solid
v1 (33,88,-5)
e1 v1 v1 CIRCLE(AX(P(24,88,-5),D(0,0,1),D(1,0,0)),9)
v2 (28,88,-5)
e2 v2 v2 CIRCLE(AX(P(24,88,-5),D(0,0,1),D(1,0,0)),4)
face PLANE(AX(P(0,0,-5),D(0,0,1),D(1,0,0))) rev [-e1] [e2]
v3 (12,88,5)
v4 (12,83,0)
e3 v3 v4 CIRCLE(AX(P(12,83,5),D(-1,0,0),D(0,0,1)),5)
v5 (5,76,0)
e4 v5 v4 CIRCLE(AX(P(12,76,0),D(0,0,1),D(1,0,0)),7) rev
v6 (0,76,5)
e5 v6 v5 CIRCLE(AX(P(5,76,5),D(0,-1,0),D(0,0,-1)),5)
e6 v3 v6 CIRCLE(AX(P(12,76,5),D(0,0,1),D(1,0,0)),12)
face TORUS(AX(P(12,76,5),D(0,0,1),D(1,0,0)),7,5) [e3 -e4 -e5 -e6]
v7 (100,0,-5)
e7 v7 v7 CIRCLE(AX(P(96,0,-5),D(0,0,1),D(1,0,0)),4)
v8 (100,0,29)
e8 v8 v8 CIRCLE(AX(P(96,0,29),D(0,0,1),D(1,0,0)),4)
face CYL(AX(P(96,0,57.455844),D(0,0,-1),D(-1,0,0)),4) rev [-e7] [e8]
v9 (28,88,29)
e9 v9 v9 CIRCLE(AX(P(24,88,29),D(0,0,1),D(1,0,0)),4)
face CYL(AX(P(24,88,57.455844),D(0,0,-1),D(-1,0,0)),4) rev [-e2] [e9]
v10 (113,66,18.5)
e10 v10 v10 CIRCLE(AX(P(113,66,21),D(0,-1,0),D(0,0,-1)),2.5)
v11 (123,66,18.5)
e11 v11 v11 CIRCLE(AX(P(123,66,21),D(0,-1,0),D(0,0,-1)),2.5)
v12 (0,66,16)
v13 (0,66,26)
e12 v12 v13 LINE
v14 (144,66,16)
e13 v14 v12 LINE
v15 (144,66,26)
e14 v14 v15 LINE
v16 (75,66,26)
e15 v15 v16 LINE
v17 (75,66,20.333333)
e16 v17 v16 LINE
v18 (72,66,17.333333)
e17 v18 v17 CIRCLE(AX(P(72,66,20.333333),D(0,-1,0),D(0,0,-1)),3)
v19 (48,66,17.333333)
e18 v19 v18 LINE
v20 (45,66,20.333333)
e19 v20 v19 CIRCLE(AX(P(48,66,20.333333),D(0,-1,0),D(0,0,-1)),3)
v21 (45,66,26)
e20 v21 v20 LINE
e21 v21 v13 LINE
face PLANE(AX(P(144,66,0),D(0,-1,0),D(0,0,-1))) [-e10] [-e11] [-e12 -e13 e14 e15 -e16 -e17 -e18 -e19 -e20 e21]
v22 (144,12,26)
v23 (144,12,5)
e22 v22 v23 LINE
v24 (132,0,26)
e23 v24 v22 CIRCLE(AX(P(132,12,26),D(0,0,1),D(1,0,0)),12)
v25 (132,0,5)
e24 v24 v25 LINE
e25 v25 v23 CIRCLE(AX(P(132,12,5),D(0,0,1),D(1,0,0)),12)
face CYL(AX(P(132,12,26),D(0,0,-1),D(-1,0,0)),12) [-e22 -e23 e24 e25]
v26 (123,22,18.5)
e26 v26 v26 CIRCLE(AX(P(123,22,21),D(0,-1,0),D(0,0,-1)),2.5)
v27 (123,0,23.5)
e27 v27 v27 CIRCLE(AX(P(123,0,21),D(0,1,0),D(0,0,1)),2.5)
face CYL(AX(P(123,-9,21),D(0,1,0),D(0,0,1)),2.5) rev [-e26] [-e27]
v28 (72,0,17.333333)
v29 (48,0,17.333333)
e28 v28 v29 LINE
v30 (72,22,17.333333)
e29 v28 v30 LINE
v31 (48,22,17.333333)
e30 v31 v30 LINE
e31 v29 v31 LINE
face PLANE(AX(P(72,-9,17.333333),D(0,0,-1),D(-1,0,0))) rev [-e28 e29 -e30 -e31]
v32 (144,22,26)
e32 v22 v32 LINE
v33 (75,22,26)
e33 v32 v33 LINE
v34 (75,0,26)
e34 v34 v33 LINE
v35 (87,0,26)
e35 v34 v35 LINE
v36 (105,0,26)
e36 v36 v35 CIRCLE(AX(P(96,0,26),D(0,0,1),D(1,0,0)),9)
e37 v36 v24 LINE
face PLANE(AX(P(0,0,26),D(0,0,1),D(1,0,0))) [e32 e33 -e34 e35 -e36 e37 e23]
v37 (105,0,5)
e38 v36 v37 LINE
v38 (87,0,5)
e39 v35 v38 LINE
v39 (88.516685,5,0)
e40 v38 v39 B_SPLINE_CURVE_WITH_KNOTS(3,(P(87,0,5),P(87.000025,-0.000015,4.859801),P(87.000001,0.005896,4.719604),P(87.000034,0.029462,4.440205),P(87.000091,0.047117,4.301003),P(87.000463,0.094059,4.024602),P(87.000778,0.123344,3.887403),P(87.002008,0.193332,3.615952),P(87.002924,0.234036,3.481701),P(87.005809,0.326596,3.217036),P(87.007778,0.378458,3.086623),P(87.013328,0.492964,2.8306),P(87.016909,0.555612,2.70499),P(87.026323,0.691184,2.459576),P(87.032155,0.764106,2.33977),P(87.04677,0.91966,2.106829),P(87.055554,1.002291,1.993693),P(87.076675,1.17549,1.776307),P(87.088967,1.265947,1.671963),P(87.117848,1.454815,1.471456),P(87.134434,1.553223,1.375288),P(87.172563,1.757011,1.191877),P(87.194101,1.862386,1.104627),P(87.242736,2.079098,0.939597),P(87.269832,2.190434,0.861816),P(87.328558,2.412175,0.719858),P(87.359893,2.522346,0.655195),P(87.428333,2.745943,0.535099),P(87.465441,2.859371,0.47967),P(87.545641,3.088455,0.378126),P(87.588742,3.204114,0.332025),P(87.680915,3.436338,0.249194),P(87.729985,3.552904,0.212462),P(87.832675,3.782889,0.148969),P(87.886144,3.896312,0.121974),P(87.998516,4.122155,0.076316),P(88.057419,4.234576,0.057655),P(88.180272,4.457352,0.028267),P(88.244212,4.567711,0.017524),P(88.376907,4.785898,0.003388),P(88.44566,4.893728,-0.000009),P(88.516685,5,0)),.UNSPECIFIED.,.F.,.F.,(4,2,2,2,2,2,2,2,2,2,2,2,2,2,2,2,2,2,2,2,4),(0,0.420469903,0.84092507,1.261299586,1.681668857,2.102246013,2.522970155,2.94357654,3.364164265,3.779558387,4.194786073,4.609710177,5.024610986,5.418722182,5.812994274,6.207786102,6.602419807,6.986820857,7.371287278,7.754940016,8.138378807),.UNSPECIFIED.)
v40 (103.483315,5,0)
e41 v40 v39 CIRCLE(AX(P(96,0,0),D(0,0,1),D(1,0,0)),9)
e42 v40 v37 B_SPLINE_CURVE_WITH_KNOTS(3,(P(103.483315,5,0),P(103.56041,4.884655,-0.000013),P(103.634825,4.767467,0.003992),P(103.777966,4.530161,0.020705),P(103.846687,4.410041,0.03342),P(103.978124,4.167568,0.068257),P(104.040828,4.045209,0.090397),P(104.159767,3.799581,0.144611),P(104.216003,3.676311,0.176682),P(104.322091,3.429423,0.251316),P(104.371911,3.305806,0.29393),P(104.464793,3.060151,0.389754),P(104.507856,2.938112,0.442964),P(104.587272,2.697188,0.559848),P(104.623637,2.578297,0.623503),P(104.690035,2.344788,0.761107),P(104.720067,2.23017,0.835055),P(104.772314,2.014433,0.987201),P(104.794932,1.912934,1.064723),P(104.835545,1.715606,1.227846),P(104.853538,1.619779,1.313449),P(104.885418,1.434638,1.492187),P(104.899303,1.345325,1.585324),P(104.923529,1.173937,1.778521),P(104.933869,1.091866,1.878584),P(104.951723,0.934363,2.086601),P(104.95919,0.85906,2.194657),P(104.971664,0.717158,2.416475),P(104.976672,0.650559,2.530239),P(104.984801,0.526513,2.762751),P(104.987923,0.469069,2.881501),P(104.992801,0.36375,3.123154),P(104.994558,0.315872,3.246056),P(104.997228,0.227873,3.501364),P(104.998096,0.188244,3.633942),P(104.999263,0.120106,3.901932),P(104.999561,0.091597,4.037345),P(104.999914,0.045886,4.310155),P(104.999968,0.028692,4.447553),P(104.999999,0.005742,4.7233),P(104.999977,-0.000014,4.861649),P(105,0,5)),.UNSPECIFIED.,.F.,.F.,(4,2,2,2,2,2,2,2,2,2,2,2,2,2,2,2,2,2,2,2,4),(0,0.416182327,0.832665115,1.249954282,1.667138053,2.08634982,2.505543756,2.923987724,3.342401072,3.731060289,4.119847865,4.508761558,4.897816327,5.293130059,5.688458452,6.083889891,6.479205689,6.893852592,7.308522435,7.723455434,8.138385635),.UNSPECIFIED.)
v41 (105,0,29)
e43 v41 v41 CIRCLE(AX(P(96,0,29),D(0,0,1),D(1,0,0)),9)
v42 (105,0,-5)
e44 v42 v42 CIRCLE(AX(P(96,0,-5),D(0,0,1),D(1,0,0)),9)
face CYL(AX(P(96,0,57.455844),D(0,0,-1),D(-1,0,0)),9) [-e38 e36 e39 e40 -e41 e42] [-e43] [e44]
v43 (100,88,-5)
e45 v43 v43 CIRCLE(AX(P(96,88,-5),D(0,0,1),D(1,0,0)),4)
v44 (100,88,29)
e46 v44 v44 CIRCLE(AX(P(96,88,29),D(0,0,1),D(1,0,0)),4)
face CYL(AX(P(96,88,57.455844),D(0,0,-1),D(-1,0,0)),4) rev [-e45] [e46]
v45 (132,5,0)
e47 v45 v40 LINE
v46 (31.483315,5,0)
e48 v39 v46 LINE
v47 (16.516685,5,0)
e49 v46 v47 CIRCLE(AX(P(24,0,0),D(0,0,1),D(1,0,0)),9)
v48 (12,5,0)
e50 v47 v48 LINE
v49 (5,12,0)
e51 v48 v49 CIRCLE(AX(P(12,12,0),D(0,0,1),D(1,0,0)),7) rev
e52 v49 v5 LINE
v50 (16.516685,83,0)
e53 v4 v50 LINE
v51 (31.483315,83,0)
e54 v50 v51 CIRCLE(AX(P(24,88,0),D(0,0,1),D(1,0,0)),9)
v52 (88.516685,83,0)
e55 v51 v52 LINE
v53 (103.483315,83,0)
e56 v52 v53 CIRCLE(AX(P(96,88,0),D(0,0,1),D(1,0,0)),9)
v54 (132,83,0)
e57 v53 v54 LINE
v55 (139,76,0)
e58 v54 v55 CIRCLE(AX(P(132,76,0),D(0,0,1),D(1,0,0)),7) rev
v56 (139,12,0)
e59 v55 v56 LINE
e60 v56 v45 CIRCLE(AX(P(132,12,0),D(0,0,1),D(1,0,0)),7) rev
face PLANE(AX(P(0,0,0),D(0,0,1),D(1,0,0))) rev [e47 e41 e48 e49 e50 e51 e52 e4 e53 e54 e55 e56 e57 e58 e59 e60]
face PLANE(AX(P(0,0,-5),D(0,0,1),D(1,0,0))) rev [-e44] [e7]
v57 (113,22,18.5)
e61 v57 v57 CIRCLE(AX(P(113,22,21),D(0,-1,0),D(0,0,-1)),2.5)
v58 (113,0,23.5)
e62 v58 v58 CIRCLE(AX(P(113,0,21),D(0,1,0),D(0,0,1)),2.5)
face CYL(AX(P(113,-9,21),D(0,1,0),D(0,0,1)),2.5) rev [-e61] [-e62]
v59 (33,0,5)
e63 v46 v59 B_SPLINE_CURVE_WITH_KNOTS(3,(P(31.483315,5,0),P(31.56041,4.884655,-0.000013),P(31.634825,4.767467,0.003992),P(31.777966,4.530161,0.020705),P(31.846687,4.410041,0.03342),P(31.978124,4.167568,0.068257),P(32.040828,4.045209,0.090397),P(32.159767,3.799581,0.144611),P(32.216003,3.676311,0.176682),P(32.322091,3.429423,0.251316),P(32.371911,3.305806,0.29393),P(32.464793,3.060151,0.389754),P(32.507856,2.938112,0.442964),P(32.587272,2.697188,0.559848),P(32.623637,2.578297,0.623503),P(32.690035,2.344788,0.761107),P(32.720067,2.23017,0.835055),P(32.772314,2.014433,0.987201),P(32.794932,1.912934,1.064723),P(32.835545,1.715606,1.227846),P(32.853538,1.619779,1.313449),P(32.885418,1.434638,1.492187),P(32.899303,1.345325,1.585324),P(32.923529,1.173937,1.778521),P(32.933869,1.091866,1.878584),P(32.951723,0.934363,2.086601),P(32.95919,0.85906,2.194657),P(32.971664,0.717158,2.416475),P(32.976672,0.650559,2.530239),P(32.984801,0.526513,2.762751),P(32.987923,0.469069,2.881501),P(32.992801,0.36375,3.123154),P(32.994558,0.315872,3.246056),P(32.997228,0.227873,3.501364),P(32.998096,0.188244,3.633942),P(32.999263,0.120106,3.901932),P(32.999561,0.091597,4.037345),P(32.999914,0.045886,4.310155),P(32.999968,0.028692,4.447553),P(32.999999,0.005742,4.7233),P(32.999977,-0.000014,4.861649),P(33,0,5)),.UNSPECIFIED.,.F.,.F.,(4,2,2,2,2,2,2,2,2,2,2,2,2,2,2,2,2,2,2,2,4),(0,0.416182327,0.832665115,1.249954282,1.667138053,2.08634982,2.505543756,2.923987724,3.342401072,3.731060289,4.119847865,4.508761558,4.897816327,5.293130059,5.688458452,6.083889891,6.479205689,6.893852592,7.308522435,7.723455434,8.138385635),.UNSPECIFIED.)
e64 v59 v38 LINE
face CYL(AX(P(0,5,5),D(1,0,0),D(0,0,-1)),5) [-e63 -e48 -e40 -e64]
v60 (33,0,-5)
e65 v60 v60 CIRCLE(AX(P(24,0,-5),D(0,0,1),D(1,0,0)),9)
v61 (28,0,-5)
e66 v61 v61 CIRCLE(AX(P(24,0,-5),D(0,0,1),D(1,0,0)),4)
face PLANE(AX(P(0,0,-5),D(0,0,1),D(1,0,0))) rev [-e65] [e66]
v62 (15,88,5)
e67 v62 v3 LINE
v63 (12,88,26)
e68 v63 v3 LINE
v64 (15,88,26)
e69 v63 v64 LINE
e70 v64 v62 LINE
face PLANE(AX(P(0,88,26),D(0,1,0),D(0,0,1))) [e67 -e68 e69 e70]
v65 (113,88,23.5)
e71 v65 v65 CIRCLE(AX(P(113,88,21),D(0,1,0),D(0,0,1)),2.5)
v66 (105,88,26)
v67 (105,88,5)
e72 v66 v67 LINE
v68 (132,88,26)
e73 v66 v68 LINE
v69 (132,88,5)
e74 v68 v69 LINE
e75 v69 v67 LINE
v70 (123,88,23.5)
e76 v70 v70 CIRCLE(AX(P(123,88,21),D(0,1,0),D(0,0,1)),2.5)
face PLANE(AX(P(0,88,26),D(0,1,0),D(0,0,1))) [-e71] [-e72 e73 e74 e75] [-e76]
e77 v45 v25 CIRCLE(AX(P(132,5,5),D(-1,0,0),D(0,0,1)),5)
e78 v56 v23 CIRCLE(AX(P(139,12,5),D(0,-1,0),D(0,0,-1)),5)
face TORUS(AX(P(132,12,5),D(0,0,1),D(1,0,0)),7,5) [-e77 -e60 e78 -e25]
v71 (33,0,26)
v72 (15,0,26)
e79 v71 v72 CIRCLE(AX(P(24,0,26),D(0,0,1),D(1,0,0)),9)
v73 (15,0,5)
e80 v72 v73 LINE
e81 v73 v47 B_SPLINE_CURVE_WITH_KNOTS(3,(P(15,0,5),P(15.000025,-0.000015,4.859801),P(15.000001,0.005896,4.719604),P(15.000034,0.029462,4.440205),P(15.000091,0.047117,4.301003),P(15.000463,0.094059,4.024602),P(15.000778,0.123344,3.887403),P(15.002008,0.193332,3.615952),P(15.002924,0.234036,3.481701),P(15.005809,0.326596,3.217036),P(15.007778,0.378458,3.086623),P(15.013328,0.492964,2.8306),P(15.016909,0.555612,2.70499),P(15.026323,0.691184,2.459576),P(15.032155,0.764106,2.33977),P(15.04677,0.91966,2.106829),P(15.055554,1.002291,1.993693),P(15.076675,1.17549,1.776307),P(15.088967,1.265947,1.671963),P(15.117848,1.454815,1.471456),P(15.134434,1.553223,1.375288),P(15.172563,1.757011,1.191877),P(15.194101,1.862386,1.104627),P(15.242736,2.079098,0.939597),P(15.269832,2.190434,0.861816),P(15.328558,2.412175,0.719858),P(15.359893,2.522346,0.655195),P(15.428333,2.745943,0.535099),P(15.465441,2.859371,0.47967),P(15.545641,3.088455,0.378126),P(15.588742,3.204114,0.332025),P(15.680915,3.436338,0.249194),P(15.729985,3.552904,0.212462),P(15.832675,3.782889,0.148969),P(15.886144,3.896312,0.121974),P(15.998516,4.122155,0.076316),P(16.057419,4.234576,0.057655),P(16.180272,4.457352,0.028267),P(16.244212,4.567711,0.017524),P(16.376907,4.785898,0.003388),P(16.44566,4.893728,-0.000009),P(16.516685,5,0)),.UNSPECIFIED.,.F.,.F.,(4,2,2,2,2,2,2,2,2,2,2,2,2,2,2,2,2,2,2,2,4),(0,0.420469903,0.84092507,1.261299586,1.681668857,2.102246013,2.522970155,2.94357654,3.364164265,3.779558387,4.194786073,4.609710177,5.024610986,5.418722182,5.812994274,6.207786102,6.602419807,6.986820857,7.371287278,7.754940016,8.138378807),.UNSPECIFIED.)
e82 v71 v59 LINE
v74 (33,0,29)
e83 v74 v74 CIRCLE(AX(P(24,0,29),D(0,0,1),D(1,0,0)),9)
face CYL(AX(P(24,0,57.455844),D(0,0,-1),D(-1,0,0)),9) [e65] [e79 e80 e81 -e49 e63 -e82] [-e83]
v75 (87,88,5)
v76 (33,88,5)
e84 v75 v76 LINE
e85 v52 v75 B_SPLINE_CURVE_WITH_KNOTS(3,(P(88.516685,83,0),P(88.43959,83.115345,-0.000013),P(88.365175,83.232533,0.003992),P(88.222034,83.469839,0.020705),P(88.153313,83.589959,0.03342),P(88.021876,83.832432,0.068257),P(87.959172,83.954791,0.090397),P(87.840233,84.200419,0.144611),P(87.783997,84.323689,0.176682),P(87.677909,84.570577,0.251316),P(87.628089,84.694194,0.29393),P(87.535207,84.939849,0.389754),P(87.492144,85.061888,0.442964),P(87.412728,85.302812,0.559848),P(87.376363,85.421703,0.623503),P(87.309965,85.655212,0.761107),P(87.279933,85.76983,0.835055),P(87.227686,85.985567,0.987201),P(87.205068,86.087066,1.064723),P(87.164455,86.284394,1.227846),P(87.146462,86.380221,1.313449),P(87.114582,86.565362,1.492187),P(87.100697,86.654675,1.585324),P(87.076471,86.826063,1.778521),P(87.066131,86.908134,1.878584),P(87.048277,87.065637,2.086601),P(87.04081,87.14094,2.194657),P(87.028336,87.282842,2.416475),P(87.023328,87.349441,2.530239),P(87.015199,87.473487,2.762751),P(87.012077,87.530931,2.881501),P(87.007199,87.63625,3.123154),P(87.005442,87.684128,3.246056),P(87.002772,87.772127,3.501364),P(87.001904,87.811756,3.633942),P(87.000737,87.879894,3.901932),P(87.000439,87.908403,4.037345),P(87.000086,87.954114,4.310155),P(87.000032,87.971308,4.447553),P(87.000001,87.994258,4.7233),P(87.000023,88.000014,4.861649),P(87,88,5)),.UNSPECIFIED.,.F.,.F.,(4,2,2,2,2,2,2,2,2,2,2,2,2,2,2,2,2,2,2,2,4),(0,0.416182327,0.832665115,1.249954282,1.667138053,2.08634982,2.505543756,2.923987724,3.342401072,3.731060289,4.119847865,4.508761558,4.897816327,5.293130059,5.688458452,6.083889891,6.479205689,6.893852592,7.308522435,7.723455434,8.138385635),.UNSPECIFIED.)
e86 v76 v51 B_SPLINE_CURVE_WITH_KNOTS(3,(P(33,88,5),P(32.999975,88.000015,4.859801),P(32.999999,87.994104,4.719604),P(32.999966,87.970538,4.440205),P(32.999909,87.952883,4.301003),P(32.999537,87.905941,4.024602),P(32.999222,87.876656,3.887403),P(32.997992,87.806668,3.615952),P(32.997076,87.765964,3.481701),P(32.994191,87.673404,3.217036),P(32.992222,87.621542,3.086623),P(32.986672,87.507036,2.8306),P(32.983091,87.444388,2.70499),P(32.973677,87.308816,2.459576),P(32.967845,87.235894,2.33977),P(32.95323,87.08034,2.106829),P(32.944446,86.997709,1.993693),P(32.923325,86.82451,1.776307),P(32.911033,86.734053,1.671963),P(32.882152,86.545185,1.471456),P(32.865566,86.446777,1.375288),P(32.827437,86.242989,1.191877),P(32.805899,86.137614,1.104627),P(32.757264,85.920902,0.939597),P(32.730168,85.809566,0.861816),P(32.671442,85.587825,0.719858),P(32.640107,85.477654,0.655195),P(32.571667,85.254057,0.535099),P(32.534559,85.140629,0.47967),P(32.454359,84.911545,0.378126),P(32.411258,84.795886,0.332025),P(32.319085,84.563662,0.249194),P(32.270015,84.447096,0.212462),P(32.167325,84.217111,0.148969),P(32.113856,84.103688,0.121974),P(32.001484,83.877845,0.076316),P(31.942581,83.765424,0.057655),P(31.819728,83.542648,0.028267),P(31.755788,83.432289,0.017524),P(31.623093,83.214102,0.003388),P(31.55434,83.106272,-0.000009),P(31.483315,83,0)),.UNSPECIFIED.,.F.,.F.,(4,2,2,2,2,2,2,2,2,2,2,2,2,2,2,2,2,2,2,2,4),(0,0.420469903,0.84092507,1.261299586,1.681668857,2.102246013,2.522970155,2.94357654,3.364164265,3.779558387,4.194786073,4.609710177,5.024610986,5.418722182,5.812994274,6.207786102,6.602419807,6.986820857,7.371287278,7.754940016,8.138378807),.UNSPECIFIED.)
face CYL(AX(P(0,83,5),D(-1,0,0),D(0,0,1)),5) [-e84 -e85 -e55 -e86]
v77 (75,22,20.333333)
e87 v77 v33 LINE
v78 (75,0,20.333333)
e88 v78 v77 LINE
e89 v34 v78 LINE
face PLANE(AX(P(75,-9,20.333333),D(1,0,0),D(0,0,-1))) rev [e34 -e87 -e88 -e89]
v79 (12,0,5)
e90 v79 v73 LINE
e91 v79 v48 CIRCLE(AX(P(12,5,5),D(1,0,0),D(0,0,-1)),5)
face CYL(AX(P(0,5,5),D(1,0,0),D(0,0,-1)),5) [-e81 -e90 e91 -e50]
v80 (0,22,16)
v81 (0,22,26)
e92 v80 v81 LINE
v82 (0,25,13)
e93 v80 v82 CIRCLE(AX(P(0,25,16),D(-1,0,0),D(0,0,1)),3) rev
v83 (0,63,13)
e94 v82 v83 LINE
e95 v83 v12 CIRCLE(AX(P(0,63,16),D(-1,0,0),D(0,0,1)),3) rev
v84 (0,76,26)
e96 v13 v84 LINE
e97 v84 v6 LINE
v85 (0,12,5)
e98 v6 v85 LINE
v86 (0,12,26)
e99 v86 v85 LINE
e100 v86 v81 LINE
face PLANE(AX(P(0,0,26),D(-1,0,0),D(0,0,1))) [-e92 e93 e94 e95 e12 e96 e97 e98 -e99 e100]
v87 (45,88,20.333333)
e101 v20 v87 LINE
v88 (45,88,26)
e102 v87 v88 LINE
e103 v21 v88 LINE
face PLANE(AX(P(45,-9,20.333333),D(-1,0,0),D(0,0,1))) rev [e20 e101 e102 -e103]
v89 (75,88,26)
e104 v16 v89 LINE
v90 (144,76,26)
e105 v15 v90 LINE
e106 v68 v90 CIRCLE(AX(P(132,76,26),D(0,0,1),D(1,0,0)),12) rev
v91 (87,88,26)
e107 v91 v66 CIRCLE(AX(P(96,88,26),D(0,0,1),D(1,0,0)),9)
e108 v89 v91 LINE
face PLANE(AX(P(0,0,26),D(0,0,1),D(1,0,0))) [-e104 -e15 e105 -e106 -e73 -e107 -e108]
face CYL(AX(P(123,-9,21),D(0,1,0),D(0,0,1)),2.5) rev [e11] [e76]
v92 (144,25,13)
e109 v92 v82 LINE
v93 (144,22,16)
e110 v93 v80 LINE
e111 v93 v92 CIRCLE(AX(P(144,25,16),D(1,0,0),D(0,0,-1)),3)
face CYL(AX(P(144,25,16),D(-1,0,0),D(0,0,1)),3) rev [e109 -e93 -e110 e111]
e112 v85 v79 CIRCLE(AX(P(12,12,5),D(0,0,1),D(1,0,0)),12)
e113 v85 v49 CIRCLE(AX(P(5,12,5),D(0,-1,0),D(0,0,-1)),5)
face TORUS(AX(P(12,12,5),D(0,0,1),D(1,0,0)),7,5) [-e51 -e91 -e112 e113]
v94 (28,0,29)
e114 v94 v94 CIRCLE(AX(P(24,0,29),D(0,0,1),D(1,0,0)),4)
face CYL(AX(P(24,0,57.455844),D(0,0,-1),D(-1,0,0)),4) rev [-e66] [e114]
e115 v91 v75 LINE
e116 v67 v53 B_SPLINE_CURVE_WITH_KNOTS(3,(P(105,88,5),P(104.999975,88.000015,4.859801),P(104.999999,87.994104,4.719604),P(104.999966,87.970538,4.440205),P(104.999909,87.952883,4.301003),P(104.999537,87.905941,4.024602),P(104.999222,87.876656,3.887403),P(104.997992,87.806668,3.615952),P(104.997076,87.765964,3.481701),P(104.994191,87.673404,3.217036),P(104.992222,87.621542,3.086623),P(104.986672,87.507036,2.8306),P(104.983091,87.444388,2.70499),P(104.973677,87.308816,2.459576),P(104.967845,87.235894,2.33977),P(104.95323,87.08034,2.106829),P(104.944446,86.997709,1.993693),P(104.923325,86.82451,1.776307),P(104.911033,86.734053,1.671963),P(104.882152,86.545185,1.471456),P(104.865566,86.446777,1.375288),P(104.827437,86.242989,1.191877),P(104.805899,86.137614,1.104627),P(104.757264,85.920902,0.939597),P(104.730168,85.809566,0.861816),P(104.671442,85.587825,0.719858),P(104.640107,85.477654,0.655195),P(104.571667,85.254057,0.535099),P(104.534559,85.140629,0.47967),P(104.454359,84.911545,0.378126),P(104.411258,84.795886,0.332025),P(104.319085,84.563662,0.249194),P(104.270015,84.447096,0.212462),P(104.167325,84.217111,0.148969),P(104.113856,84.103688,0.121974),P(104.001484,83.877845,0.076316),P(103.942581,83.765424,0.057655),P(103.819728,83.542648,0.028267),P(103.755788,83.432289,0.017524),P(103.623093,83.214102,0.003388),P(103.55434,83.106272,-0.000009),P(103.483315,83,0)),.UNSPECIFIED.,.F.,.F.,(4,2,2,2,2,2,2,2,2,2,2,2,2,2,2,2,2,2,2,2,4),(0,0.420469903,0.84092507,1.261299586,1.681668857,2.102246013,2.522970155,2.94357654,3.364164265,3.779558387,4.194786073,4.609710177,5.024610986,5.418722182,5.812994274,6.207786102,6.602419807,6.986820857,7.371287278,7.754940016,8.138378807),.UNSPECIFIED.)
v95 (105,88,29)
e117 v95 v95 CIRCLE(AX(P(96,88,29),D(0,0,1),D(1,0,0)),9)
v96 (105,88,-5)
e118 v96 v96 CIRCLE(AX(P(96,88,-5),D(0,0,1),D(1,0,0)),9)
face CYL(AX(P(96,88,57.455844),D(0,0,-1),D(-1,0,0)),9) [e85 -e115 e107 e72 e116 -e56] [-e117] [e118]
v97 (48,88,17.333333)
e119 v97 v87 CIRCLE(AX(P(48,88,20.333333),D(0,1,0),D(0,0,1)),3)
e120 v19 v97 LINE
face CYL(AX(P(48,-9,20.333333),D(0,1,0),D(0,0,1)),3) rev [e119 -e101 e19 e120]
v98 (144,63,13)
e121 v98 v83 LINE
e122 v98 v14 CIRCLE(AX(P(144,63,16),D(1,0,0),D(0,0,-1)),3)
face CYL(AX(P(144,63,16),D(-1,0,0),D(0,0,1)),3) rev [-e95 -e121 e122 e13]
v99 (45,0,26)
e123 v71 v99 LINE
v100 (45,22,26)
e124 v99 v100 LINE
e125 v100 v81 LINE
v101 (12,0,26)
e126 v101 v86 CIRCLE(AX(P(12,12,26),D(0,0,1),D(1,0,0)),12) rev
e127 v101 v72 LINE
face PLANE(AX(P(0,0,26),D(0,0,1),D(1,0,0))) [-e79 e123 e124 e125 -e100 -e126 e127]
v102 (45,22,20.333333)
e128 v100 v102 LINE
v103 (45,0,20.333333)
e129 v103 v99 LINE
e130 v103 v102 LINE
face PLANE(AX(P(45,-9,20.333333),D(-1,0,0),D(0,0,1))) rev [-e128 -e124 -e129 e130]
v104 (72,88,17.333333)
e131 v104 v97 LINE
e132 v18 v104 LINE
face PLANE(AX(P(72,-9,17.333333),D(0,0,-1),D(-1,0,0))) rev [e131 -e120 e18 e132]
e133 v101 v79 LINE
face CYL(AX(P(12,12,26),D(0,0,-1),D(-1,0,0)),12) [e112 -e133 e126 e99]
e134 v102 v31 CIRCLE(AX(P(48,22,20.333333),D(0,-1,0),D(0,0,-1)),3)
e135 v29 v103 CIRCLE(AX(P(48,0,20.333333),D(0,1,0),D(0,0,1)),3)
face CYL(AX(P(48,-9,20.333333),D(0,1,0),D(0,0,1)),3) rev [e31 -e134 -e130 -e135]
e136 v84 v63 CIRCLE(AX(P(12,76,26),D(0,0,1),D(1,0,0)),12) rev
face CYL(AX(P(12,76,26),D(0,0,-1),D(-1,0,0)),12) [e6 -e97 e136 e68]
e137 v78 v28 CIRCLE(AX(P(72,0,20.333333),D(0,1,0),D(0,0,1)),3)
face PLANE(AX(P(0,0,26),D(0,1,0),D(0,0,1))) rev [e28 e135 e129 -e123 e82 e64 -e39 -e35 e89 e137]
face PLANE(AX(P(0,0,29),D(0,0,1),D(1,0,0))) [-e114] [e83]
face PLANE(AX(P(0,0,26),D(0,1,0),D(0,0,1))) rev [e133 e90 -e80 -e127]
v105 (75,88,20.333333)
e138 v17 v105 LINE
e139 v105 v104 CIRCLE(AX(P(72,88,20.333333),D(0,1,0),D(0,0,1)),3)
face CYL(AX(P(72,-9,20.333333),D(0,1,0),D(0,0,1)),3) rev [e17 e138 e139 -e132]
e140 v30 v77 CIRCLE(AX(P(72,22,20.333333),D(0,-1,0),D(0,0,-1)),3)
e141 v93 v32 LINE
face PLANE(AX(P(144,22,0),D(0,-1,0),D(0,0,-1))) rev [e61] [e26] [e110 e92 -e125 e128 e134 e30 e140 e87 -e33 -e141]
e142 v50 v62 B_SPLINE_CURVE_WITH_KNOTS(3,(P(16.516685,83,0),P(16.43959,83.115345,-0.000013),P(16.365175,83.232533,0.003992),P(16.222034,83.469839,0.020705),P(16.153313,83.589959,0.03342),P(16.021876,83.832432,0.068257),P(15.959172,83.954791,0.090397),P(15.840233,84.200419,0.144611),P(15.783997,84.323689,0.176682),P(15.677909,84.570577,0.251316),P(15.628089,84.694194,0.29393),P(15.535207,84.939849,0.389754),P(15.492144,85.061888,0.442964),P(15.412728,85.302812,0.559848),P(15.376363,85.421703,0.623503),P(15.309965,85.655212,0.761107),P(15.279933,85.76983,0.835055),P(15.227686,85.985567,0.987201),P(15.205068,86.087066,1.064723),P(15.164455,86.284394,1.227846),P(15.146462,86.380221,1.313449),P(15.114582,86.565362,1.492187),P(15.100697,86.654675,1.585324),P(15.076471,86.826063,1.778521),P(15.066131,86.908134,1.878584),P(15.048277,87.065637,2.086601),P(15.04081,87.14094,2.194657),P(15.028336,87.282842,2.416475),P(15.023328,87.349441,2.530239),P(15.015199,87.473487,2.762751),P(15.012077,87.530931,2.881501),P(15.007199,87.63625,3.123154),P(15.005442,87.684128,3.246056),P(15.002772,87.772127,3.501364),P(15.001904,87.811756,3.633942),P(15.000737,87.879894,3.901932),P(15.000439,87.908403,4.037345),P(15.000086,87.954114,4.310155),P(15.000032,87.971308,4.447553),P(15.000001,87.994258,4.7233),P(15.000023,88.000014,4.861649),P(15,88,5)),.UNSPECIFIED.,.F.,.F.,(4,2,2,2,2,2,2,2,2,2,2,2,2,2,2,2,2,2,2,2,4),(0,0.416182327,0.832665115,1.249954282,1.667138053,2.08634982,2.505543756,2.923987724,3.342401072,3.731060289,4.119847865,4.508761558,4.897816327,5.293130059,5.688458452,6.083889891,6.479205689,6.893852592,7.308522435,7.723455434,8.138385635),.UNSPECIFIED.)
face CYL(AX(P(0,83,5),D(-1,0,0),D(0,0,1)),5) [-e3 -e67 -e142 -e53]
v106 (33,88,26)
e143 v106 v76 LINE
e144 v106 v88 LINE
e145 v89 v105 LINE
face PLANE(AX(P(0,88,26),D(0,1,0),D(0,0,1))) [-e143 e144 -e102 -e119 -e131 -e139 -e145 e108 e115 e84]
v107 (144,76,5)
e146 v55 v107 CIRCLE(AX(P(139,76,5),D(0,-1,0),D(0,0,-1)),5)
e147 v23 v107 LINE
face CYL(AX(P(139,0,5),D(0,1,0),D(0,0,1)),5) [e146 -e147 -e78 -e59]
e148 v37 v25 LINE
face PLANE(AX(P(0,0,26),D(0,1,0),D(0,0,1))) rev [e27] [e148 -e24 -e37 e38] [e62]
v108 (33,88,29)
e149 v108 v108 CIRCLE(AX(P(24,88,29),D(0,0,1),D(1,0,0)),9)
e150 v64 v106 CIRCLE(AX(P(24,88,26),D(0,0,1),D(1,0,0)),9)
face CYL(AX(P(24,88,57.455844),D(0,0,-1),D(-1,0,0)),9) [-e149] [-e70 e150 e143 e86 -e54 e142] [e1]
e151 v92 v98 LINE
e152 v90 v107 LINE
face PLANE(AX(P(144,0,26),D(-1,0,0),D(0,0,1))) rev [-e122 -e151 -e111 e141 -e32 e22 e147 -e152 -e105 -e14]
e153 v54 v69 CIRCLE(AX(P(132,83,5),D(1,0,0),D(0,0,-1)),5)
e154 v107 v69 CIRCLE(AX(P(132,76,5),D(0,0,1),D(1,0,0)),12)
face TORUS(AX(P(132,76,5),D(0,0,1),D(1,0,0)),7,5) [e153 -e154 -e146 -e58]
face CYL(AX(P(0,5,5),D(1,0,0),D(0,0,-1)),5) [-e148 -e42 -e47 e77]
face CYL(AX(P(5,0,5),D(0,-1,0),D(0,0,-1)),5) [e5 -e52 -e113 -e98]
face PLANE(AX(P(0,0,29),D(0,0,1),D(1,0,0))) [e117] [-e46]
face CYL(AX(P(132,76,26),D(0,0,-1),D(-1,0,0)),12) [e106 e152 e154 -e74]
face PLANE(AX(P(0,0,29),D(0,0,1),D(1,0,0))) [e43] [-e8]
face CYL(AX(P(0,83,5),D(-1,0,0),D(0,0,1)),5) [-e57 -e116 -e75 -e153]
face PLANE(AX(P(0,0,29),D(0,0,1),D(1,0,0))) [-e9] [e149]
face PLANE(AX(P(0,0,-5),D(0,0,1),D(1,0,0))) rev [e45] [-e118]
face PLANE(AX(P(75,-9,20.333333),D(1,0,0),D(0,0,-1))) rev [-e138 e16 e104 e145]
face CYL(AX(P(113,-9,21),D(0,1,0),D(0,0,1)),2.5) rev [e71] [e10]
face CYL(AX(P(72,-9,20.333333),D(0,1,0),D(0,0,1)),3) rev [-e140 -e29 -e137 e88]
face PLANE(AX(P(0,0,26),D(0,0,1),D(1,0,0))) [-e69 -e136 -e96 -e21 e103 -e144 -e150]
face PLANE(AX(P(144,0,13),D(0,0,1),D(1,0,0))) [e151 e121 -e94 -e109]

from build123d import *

# Parameters (mm, degrees)
SKETCH1_W               = 72
SKETCH1_H               = 40
BOSS_EXTRUDE1_DEPTH     = 26
BOSS_EXTRUDE3_START     = -5
SKETCH1_4_R             = 9
SKETCH1_4_R_2           = 4
BOSS_EXTRUDE3_DEPTH     = 34
CUT_EXTRUDE2_DEPTH      = 177.028406798
CUT_EXTRUDE2_DEPTH_BACK = 177.028406798
CUT_EXTRUDE3_DEPTH      = 177.028406798
CUT_EXTRUDE3_DEPTH_BACK = 177.028406798
SKETCH3_R               = 2.5
FILLET1_R               = 5


with BuildPart() as part:
    # Sketch1 → Boss-Extrude1 (new body)
    # profile 1 of 2: a face of its own
    with BuildSketch(Plane.XY):
        with BuildLine():
            Line((87, 88), (33, 88))
            ThreePointArc((33, 88), (24, 79), (15, 88))
            Line((15, 88), (12, 88))
            ThreePointArc((12, 88), (3.514718626, 84.485281374), (0, 76))
            Line((0, 76), (0, 12))
            ThreePointArc((0, 12), (3.514718626, 3.514718626), (12, 0))
            Line((12, 0), (15, 0))
            ThreePointArc((15, 0), (24, 9), (33, 0))
            Line((33, 0), (87, 0))
            ThreePointArc((87, 0), (96, 9), (105, 0))
            Line((105, 0), (132, 0))
            ThreePointArc((132, 0), (140.485281374, 3.514718626), (144, 12))
            Line((144, 12), (144, 76))
            ThreePointArc((144, 76), (140.485281374, 84.485281374), (132, 88))
            Line((132, 88), (105, 88))
            ThreePointArc((105, 88), (96, 79), (87, 88))
        make_face()
        with Locations((72, 44)):
            Rectangle(SKETCH1_W, SKETCH1_H, mode=Mode.SUBTRACT)
    # profile 2 of 2: a face of its own
    with BuildSketch(Plane.XY):
        with Locations((72, 44)):
            Rectangle(SKETCH1_W, SKETCH1_H)
    extrude(amount=BOSS_EXTRUDE1_DEPTH)

    # Sketch1<4> → Boss-Extrude3 (add)
    # profile 1 of 4: a face of its own
    with BuildSketch(Plane.XY.offset(BOSS_EXTRUDE3_START)):
        with Locations((24, 88)):
            Circle(SKETCH1_4_R)
        with Locations((24, 88)):
            Circle(SKETCH1_4_R_2, mode=Mode.SUBTRACT)
    # profile 2 of 4: a face of its own
    with BuildSketch(Plane.XY.offset(BOSS_EXTRUDE3_START)):
        with Locations((96, 88)):
            Circle(SKETCH1_4_R)
        with Locations((96, 88)):
            Circle(SKETCH1_4_R_2, mode=Mode.SUBTRACT)
    # profile 3 of 4: a face of its own
    with BuildSketch(Plane.XY.offset(BOSS_EXTRUDE3_START)):
        with Locations((96, 0)):
            Circle(SKETCH1_4_R)
        with Locations((96, 0)):
            Circle(SKETCH1_4_R_2, mode=Mode.SUBTRACT)
    # profile 4 of 4: a face of its own
    with BuildSketch(Plane.XY.offset(BOSS_EXTRUDE3_START)):
        with Locations((24, 0)):
            Circle(SKETCH1_4_R)
        with Locations((24, 0)):
            Circle(SKETCH1_4_R_2, mode=Mode.SUBTRACT)
    extrude(amount=BOSS_EXTRUDE3_DEPTH)

    # Sketch2 → Cut-Extrude2 (cut, two sides: drawn at the far end of the back side and taken through both)
    with BuildSketch(Plane(origin=(0, 0, 0), x_dir=(0, 0, -1), z_dir=(1, 0, 0)).offset(-CUT_EXTRUDE2_DEPTH_BACK)):
        with BuildLine():
            Line((-13, 25), (-13, 63))
            ThreePointArc((-13, 63), (-13.878679656, 65.121320344), (-16, 66))
            Line((-16, 66), (-26, 66))
            Line((-26, 66), (-26, 22))
            Line((-26, 22), (-16, 22))
            ThreePointArc((-16, 22), (-13.878679656, 22.878679656), (-13, 25))
        make_face()
    extrude(amount=CUT_EXTRUDE2_DEPTH + CUT_EXTRUDE2_DEPTH_BACK, mode=Mode.SUBTRACT)

    # Sketch3 → Cut-Extrude3 (cut, two sides: drawn at the far end of the back side and taken through both)
    with BuildSketch(Plane(origin=(0, 0, 0), x_dir=(1, 0, 0), z_dir=(0, 1, 0)).offset(-CUT_EXTRUDE3_DEPTH_BACK)):
        with Locations(Location((113, -21, 0), (0, 0, 270))):
            Circle(SKETCH3_R)
        with Locations(Location((123, -21, 0), (0, 0, 270))):
            Circle(SKETCH3_R)
        with BuildLine():
            Line((72, -17.333333333), (48, -17.333333333))
            ThreePointArc((48, -17.333333333), (45.878679656, -18.21201299), (45, -20.333333333))
            Line((45, -20.333333333), (45, -26))
            Line((45, -26), (75, -26))
            Line((75, -26), (75, -20.333333333))
            ThreePointArc((75, -20.333333333), (74.121320344, -18.21201299), (72, -17.333333333))
        make_face()
    extrude(amount=CUT_EXTRUDE3_DEPTH + CUT_EXTRUDE3_DEPTH_BACK, mode=Mode.SUBTRACT)

    # Fillet1
    # the kernel refuses this fillet: 5 mm, written as the material it takes off along each edge
    with BuildSketch(Plane(origin=(27.5, 88, 0), x_dir=(0, -1, 0), z_dir=(-1, 0, 0))) as fillet1_piece_1_section:
        with BuildLine():
            CenterArc((FILLET1_R, FILLET1_R), FILLET1_R, 180, 90)
            Line((0, FILLET1_R), (0, 0))
            Line((0, 0), (FILLET1_R, 0))
        make_face()
    fillet1_piece_1 = extrude(amount=15.5, mode=Mode.PRIVATE)
    fillet1_piece_1 = fillet1_piece_1 - Plane(origin=(24, 88, 2.038539575), x_dir=(1, 0, 0), z_dir=(0, 0, -1)) * Cylinder(9, 51, mode=Mode.PRIVATE)
    add(fillet1_piece_1, mode=Mode.SUBTRACT)
    with BuildSketch(Plane(origin=(99.5, 88, 0), x_dir=(0, -1, 0), z_dir=(-1, 0, 0))) as fillet1_piece_2_section:
        with BuildLine():
            CenterArc((FILLET1_R, FILLET1_R), FILLET1_R, 180, 90)
            Line((0, FILLET1_R), (0, 0))
            Line((0, 0), (FILLET1_R, 0))
        make_face()
    fillet1_piece_2 = extrude(amount=79, mode=Mode.PRIVATE)
    fillet1_piece_2 = fillet1_piece_2 - Plane(origin=(24, 88, 1.113779656), x_dir=(1, 0, 0), z_dir=(0, 0, -1)) * Cylinder(9, 178, mode=Mode.PRIVATE)
    fillet1_piece_2 = fillet1_piece_2 - Plane(origin=(96, 88, 1.113779656), x_dir=(1, 0, 0), z_dir=(0, 0, -1)) * Cylinder(9, 178, mode=Mode.PRIVATE)
    add(fillet1_piece_2, mode=Mode.SUBTRACT)
    with BuildSketch(Plane(origin=(132, 88, 0), x_dir=(0, -1, 0), z_dir=(-1, 0, 0))) as fillet1_piece_3_section:
        with BuildLine():
            CenterArc((FILLET1_R, FILLET1_R), FILLET1_R, 180, 90)
            Line((0, FILLET1_R), (0, 0))
            Line((0, 0), (FILLET1_R, 0))
        make_face()
    fillet1_piece_3 = extrude(amount=39.5, mode=Mode.PRIVATE)
    fillet1_piece_3 = fillet1_piece_3 - Plane(origin=(96, 88, 0.84758794), x_dir=(1, 0, 0), z_dir=(0, 0, -1)) * Cylinder(9, 99, mode=Mode.PRIVATE)
    add(fillet1_piece_3, mode=Mode.SUBTRACT)
    with BuildSketch(Plane(origin=(132, 76, 0), x_dir=(1, 0, 0), z_dir=(0, -1, 0))) as fillet1_piece_4:
        with BuildLine():
            CenterArc((12 - FILLET1_R, FILLET1_R), FILLET1_R, 270, 90)
            Line((12, FILLET1_R), (12, 0))
            Line((12, 0), (12 - FILLET1_R, 0))
        make_face()
    revolve(axis=Axis((132, 76, 0), (0, 0, 1)), revolution_arc=90, mode=Mode.SUBTRACT)
    with BuildSketch(Plane(origin=(144, 12, 0), x_dir=(-1, 0, 0), z_dir=(0, 1, 0)), Plane(origin=(0, 76, 0), x_dir=(1, 0, 0), z_dir=(0, -1, 0))) as fillet1_piece_5:
        with BuildLine():
            CenterArc((FILLET1_R, FILLET1_R), FILLET1_R, 180, 90)
            Line((0, FILLET1_R), (0, 0))
            Line((0, 0), (FILLET1_R, 0))
        make_face()
    extrude(amount=64, mode=Mode.SUBTRACT)
    with BuildSketch(Plane(origin=(132, 12, 0), x_dir=(0, -1, 0), z_dir=(-1, 0, 0))) as fillet1_piece_6:
        with BuildLine():
            CenterArc((12 - FILLET1_R, FILLET1_R), FILLET1_R, 270, 90)
            Line((12, FILLET1_R), (12, 0))
            Line((12, 0), (12 - FILLET1_R, 0))
        make_face()
    revolve(axis=Axis((132, 12, 0), (0, 0, 1)), revolution_arc=90, mode=Mode.SUBTRACT)
    with BuildSketch(Plane(origin=(92.5, 0, 0), x_dir=(0, 1, 0), z_dir=(1, 0, 0))) as fillet1_piece_7_section:
        with BuildLine():
            CenterArc((FILLET1_R, FILLET1_R), FILLET1_R, 180, 90)
            Line((0, FILLET1_R), (0, 0))
            Line((0, 0), (FILLET1_R, 0))
        make_face()
    fillet1_piece_7 = extrude(amount=39.5, mode=Mode.PRIVATE)
    fillet1_piece_7 = fillet1_piece_7 - Plane(origin=(96, 0, 1.166964438), x_dir=(1, 0, 0), z_dir=(0, 0, -1)) * Cylinder(9, 99, mode=Mode.PRIVATE)
    add(fillet1_piece_7, mode=Mode.SUBTRACT)
    with BuildSketch(Plane(origin=(20.5, 0, 0), x_dir=(0, 1, 0), z_dir=(1, 0, 0))) as fillet1_piece_8_section:
        with BuildLine():
            CenterArc((FILLET1_R, FILLET1_R), FILLET1_R, 180, 90)
            Line((0, FILLET1_R), (0, 0))
            Line((0, 0), (FILLET1_R, 0))
        make_face()
    fillet1_piece_8 = extrude(amount=79, mode=Mode.PRIVATE)
    fillet1_piece_8 = fillet1_piece_8 - Plane(origin=(96, 0, 1.113779656), x_dir=(1, 0, 0), z_dir=(0, 0, -1)) * Cylinder(9, 178, mode=Mode.PRIVATE)
    fillet1_piece_8 = fillet1_piece_8 - Plane(origin=(24, 0, 1.113779656), x_dir=(1, 0, 0), z_dir=(0, 0, -1)) * Cylinder(9, 178, mode=Mode.PRIVATE)
    add(fillet1_piece_8, mode=Mode.SUBTRACT)
    with BuildSketch(Plane(origin=(12, 0, 0), x_dir=(0, 1, 0), z_dir=(1, 0, 0))) as fillet1_piece_9_section:
        with BuildLine():
            CenterArc((FILLET1_R, FILLET1_R), FILLET1_R, 180, 90)
            Line((0, FILLET1_R), (0, 0))
            Line((0, 0), (FILLET1_R, 0))
        make_face()
    fillet1_piece_9 = extrude(amount=15.5, mode=Mode.PRIVATE)
    fillet1_piece_9 = fillet1_piece_9 - Plane(origin=(24, 0, 0.994853316), x_dir=(1, 0, 0), z_dir=(0, 0, -1)) * Cylinder(9, 51, mode=Mode.PRIVATE)
    add(fillet1_piece_9, mode=Mode.SUBTRACT)
    with BuildSketch(Plane(origin=(12, 12, 0), x_dir=(-1, 0, 0), z_dir=(0, 1, 0))) as fillet1_piece_10:
        with BuildLine():
            CenterArc((12 - FILLET1_R, FILLET1_R), FILLET1_R, 270, 90)
            Line((12, FILLET1_R), (12, 0))
            Line((12, 0), (12 - FILLET1_R, 0))
        make_face()
    revolve(axis=Axis((12, 12, 0), (0, 0, 1)), revolution_arc=90, mode=Mode.SUBTRACT)
    with BuildSketch(Plane(origin=(12, 76, 0), x_dir=(0, 1, 0), z_dir=(1, 0, 0))) as fillet1_piece_11:
        with BuildLine():
            CenterArc((12 - FILLET1_R, FILLET1_R), FILLET1_R, 270, 90)
            Line((12, FILLET1_R), (12, 0))
            Line((12, 0), (12 - FILLET1_R, 0))
        make_face()
    revolve(axis=Axis((12, 76, 0), (0, 0, 1)), revolution_arc=90, mode=Mode.SUBTRACT)


solid = part.part
